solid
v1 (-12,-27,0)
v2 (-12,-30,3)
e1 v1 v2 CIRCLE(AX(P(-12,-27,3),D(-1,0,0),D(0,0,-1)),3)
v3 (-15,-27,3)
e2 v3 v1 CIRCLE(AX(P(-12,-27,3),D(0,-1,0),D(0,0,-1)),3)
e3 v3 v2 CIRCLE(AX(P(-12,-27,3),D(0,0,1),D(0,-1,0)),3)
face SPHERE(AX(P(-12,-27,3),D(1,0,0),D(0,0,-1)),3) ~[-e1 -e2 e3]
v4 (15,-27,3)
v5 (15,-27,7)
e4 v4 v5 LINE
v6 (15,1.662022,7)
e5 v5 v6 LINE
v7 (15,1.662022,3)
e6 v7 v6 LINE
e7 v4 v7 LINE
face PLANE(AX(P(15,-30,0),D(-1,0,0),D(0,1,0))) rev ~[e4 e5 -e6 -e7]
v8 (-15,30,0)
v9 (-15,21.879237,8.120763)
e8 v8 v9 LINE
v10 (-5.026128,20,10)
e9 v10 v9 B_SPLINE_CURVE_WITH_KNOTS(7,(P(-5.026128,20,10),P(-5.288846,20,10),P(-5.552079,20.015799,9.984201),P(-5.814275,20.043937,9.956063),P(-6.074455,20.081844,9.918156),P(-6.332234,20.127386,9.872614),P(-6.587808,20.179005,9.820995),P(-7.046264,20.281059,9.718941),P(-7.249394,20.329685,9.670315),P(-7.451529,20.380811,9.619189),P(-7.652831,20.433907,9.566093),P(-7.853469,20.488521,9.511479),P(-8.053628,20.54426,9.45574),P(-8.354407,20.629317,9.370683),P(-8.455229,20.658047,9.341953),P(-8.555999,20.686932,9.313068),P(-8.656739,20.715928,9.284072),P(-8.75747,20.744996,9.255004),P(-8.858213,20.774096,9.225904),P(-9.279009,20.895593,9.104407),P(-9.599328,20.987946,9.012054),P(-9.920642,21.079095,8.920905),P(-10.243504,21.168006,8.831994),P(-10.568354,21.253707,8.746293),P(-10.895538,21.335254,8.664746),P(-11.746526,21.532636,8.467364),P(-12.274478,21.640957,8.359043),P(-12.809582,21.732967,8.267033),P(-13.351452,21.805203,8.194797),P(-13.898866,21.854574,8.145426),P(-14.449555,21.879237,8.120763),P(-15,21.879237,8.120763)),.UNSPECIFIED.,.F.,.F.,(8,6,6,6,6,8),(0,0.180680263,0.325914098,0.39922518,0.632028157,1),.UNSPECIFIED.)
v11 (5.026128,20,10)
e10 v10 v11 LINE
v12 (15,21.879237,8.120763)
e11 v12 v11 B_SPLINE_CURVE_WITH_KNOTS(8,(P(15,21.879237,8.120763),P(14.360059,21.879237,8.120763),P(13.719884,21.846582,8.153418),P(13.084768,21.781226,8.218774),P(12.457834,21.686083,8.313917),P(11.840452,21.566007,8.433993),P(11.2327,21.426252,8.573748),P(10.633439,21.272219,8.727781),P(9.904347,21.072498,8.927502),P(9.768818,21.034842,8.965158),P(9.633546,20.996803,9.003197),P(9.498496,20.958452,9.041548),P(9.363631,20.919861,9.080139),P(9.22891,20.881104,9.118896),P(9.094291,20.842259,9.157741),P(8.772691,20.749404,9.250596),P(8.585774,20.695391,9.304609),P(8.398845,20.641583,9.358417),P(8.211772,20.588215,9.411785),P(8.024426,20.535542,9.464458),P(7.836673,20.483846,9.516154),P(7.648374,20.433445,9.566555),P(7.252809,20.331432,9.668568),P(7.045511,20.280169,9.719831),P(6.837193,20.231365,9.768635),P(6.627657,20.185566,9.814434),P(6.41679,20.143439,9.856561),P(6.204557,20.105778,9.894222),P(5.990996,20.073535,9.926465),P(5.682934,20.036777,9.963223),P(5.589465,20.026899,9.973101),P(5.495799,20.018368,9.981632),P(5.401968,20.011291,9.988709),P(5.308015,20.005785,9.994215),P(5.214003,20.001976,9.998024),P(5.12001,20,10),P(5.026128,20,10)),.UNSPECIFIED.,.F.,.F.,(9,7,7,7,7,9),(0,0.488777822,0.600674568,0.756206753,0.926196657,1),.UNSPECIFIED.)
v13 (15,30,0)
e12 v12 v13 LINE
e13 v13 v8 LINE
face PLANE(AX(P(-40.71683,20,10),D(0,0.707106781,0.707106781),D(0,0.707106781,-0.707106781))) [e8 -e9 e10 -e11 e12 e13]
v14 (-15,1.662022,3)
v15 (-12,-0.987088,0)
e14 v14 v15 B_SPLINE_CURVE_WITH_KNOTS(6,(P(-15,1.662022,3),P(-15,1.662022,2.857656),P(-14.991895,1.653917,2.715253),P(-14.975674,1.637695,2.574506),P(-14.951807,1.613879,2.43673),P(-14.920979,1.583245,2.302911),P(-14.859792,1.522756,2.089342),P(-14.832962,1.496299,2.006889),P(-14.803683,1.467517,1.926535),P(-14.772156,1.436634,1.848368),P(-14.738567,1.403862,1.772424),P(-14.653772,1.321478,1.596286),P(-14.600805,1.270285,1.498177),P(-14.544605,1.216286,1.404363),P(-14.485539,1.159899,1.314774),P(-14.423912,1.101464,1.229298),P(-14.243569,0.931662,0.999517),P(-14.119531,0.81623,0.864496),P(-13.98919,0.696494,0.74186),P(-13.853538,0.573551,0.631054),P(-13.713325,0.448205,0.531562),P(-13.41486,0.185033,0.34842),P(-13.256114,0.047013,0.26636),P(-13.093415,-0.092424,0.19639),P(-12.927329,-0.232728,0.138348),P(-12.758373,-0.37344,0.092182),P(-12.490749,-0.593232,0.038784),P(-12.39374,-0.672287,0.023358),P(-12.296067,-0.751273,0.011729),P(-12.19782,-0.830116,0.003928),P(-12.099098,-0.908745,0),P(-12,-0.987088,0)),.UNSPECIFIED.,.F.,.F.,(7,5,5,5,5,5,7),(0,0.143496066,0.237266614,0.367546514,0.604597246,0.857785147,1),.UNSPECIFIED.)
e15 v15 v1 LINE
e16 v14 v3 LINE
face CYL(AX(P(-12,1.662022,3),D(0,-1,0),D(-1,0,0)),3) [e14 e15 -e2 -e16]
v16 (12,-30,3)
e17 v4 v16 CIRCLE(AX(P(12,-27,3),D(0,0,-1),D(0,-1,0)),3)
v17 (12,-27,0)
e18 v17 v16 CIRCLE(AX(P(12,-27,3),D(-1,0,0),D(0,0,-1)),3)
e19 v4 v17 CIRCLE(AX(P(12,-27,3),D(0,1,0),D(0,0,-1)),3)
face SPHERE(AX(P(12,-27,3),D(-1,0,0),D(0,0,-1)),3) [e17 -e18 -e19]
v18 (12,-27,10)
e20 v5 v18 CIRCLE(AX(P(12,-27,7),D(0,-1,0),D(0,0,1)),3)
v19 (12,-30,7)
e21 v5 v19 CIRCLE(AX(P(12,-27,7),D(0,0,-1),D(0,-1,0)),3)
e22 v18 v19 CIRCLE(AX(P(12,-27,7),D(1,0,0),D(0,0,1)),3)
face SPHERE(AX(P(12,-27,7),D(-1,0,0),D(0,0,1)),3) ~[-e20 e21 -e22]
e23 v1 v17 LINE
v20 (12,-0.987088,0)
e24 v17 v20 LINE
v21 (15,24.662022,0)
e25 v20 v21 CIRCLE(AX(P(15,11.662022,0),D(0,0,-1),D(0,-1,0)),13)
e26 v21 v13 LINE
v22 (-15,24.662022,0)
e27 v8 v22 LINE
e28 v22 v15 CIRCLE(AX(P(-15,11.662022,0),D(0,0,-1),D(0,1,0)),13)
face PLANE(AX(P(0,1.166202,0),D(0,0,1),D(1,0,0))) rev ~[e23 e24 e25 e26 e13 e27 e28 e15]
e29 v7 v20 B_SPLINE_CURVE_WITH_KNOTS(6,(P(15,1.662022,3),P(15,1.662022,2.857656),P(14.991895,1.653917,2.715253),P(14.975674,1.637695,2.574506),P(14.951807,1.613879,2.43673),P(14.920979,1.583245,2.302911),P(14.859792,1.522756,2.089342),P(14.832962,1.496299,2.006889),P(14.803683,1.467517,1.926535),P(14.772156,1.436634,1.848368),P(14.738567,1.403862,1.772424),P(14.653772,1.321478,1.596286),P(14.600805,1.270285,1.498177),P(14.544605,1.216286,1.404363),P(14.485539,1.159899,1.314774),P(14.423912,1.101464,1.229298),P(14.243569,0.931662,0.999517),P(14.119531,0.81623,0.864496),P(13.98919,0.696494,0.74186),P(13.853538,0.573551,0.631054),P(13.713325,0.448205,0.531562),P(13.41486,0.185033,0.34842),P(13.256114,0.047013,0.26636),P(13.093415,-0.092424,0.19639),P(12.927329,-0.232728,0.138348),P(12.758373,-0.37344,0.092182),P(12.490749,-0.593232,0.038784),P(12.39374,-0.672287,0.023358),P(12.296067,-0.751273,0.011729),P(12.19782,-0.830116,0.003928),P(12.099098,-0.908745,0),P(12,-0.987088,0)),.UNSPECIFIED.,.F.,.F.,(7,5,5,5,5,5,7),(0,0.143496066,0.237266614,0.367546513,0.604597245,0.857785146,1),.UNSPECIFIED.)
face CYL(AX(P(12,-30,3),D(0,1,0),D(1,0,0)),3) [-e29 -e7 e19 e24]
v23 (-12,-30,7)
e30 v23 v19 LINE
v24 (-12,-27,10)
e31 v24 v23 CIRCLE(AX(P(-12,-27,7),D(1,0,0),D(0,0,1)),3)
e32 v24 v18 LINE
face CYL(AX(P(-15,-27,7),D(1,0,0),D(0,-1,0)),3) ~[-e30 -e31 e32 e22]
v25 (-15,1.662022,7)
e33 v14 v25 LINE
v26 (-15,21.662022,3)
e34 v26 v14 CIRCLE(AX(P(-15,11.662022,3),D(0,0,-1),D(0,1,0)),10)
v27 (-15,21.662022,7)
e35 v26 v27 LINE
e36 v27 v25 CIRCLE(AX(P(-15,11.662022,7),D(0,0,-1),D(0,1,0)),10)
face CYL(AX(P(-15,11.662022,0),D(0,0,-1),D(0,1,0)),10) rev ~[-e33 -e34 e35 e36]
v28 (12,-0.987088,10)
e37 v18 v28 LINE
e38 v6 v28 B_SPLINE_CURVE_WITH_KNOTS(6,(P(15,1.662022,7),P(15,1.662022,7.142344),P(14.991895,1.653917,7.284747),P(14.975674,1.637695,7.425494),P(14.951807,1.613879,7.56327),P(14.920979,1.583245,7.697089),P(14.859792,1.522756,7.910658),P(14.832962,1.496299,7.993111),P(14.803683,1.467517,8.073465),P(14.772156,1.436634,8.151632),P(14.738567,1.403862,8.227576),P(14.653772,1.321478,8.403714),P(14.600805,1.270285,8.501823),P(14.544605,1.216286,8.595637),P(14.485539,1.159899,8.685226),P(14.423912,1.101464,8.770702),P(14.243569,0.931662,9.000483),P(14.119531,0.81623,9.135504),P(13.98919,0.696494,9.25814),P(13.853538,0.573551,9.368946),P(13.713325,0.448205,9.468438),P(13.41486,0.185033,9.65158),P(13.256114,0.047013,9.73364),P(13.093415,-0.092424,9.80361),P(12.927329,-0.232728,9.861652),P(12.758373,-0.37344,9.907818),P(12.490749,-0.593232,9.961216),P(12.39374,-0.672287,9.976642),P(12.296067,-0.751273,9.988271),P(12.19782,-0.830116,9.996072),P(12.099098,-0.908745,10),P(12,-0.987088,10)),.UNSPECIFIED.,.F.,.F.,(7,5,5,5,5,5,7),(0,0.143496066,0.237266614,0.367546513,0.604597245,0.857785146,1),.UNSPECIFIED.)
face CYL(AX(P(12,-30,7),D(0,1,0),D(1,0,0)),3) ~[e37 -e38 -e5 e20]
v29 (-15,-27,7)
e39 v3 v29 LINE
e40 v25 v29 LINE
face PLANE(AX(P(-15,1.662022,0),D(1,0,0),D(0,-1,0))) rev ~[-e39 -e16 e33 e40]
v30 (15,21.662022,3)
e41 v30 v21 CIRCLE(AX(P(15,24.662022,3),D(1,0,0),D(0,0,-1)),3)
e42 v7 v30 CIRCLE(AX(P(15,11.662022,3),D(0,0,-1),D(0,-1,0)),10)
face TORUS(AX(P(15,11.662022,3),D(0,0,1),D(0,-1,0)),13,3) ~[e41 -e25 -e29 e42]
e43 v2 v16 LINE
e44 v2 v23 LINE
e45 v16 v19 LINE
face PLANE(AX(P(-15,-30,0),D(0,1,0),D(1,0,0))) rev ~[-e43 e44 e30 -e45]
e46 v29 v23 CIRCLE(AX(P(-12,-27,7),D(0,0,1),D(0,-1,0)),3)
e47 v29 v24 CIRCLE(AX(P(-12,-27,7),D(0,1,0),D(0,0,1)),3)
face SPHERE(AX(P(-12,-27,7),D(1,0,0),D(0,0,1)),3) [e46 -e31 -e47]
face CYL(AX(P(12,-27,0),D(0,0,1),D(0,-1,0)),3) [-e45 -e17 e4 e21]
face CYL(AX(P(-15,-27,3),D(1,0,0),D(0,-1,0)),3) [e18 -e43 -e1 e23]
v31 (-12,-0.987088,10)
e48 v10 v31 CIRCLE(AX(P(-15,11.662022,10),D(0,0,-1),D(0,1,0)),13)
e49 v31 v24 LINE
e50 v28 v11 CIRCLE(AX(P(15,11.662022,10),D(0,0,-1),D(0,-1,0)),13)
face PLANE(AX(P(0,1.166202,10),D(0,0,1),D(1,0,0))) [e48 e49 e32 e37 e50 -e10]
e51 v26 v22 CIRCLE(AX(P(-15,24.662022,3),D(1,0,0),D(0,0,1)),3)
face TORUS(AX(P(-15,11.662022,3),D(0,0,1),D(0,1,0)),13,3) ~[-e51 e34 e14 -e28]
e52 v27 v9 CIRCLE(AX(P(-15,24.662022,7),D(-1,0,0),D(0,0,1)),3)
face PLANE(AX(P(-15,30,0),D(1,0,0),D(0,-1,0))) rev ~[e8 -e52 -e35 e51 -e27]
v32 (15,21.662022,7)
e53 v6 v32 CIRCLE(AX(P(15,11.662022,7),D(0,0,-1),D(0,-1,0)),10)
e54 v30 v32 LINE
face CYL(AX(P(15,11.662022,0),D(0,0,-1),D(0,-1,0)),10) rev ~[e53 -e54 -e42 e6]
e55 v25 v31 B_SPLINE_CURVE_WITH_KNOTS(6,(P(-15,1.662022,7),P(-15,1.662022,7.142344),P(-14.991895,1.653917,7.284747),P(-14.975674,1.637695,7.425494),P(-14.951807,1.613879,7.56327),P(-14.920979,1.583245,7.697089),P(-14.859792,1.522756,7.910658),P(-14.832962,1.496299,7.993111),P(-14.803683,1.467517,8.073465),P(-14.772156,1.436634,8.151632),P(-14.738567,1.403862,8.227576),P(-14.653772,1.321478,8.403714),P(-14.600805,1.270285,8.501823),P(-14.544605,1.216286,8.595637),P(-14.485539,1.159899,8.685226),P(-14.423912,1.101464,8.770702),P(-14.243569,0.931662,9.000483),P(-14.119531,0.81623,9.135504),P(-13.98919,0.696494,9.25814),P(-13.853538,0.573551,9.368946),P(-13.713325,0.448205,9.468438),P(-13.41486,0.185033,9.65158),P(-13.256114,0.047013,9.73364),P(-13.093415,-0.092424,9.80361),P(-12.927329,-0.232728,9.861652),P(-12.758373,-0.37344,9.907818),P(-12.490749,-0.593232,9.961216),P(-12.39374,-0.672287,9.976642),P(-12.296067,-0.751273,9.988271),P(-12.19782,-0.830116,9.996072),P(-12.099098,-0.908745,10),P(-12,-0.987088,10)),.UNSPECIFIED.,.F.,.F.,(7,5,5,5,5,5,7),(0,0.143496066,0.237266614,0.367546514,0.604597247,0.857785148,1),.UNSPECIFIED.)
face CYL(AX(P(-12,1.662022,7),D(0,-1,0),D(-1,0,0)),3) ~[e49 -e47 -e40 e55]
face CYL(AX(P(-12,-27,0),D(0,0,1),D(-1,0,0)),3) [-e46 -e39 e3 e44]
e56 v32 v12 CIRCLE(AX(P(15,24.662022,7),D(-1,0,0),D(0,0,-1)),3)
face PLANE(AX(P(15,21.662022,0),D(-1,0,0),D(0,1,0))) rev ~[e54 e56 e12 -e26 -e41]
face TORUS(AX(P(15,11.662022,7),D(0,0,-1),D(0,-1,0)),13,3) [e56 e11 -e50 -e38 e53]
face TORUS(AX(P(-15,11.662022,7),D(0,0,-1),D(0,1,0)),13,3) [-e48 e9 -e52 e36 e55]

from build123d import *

# Parameters (mm, degrees)
F1_DEPTH    = 10
F2_R        = 3
F3_T1_DEPTH = 81.4336597593


# Not quite as in the source:
# - a fillet or chamfer that OpenCascade refuses, or shapes differently, is made with other operations: its cross-section is extruded or revolved along the edge and cut away or added


with BuildPart() as f1:
    # F0 (on Top) → F1 (new body)
    with BuildSketch(Plane.XY):
        with BuildLine():
            Line((15, 30), (-15, 30))
            Line((-15, 30), (-15, 21.6620222107))
            ThreePointArc((-15, 21.6620222107), (-5, 11.6620222107), (-15, 1.6620222107))
            Line((-15, 1.6620222107), (-15, -30))
            Line((-15, -30), (15, -30))
            Line((15, -30), (15, 1.6620222107))
            ThreePointArc((15, 1.6620222107), (5, 11.6620222107), (15, 21.6620222107))
            Line((15, 21.6620222107), (15, 30))
        make_face()
    extrude(amount=F1_DEPTH)

    # F2
    f2_edges = [f1.edges().sort_by_distance(p)[0] for p in [
        (-5, 11.662022, 10),
        (5, 11.662022, 10),
        (5, 11.662022, 0),
        (-5, 11.662022, 0),
        (0, -30, 0),
        (-15, -14.168989, 0),
        (15, -14.168989, 0),
        (0, -30, 10),
        (15, -14.168989, 10),
        (-15, -14.168989, 10),
        (15, -30, 5),
        (-15, -30, 5),
    ]]
    fillet(f2_edges, radius=F2_R)

    # F3: chamfer of 10 on 1 edges, made by hand

    # F3_s2 → F3_t1 (cut)
    with BuildSketch(Plane.YZ.offset(-40.7168298797)):
        Polygon((20, 10), (30, 0), (30, 10), align=None)
    extrude(amount=F3_T1_DEPTH, mode=Mode.SUBTRACT)


solid = f1.part
